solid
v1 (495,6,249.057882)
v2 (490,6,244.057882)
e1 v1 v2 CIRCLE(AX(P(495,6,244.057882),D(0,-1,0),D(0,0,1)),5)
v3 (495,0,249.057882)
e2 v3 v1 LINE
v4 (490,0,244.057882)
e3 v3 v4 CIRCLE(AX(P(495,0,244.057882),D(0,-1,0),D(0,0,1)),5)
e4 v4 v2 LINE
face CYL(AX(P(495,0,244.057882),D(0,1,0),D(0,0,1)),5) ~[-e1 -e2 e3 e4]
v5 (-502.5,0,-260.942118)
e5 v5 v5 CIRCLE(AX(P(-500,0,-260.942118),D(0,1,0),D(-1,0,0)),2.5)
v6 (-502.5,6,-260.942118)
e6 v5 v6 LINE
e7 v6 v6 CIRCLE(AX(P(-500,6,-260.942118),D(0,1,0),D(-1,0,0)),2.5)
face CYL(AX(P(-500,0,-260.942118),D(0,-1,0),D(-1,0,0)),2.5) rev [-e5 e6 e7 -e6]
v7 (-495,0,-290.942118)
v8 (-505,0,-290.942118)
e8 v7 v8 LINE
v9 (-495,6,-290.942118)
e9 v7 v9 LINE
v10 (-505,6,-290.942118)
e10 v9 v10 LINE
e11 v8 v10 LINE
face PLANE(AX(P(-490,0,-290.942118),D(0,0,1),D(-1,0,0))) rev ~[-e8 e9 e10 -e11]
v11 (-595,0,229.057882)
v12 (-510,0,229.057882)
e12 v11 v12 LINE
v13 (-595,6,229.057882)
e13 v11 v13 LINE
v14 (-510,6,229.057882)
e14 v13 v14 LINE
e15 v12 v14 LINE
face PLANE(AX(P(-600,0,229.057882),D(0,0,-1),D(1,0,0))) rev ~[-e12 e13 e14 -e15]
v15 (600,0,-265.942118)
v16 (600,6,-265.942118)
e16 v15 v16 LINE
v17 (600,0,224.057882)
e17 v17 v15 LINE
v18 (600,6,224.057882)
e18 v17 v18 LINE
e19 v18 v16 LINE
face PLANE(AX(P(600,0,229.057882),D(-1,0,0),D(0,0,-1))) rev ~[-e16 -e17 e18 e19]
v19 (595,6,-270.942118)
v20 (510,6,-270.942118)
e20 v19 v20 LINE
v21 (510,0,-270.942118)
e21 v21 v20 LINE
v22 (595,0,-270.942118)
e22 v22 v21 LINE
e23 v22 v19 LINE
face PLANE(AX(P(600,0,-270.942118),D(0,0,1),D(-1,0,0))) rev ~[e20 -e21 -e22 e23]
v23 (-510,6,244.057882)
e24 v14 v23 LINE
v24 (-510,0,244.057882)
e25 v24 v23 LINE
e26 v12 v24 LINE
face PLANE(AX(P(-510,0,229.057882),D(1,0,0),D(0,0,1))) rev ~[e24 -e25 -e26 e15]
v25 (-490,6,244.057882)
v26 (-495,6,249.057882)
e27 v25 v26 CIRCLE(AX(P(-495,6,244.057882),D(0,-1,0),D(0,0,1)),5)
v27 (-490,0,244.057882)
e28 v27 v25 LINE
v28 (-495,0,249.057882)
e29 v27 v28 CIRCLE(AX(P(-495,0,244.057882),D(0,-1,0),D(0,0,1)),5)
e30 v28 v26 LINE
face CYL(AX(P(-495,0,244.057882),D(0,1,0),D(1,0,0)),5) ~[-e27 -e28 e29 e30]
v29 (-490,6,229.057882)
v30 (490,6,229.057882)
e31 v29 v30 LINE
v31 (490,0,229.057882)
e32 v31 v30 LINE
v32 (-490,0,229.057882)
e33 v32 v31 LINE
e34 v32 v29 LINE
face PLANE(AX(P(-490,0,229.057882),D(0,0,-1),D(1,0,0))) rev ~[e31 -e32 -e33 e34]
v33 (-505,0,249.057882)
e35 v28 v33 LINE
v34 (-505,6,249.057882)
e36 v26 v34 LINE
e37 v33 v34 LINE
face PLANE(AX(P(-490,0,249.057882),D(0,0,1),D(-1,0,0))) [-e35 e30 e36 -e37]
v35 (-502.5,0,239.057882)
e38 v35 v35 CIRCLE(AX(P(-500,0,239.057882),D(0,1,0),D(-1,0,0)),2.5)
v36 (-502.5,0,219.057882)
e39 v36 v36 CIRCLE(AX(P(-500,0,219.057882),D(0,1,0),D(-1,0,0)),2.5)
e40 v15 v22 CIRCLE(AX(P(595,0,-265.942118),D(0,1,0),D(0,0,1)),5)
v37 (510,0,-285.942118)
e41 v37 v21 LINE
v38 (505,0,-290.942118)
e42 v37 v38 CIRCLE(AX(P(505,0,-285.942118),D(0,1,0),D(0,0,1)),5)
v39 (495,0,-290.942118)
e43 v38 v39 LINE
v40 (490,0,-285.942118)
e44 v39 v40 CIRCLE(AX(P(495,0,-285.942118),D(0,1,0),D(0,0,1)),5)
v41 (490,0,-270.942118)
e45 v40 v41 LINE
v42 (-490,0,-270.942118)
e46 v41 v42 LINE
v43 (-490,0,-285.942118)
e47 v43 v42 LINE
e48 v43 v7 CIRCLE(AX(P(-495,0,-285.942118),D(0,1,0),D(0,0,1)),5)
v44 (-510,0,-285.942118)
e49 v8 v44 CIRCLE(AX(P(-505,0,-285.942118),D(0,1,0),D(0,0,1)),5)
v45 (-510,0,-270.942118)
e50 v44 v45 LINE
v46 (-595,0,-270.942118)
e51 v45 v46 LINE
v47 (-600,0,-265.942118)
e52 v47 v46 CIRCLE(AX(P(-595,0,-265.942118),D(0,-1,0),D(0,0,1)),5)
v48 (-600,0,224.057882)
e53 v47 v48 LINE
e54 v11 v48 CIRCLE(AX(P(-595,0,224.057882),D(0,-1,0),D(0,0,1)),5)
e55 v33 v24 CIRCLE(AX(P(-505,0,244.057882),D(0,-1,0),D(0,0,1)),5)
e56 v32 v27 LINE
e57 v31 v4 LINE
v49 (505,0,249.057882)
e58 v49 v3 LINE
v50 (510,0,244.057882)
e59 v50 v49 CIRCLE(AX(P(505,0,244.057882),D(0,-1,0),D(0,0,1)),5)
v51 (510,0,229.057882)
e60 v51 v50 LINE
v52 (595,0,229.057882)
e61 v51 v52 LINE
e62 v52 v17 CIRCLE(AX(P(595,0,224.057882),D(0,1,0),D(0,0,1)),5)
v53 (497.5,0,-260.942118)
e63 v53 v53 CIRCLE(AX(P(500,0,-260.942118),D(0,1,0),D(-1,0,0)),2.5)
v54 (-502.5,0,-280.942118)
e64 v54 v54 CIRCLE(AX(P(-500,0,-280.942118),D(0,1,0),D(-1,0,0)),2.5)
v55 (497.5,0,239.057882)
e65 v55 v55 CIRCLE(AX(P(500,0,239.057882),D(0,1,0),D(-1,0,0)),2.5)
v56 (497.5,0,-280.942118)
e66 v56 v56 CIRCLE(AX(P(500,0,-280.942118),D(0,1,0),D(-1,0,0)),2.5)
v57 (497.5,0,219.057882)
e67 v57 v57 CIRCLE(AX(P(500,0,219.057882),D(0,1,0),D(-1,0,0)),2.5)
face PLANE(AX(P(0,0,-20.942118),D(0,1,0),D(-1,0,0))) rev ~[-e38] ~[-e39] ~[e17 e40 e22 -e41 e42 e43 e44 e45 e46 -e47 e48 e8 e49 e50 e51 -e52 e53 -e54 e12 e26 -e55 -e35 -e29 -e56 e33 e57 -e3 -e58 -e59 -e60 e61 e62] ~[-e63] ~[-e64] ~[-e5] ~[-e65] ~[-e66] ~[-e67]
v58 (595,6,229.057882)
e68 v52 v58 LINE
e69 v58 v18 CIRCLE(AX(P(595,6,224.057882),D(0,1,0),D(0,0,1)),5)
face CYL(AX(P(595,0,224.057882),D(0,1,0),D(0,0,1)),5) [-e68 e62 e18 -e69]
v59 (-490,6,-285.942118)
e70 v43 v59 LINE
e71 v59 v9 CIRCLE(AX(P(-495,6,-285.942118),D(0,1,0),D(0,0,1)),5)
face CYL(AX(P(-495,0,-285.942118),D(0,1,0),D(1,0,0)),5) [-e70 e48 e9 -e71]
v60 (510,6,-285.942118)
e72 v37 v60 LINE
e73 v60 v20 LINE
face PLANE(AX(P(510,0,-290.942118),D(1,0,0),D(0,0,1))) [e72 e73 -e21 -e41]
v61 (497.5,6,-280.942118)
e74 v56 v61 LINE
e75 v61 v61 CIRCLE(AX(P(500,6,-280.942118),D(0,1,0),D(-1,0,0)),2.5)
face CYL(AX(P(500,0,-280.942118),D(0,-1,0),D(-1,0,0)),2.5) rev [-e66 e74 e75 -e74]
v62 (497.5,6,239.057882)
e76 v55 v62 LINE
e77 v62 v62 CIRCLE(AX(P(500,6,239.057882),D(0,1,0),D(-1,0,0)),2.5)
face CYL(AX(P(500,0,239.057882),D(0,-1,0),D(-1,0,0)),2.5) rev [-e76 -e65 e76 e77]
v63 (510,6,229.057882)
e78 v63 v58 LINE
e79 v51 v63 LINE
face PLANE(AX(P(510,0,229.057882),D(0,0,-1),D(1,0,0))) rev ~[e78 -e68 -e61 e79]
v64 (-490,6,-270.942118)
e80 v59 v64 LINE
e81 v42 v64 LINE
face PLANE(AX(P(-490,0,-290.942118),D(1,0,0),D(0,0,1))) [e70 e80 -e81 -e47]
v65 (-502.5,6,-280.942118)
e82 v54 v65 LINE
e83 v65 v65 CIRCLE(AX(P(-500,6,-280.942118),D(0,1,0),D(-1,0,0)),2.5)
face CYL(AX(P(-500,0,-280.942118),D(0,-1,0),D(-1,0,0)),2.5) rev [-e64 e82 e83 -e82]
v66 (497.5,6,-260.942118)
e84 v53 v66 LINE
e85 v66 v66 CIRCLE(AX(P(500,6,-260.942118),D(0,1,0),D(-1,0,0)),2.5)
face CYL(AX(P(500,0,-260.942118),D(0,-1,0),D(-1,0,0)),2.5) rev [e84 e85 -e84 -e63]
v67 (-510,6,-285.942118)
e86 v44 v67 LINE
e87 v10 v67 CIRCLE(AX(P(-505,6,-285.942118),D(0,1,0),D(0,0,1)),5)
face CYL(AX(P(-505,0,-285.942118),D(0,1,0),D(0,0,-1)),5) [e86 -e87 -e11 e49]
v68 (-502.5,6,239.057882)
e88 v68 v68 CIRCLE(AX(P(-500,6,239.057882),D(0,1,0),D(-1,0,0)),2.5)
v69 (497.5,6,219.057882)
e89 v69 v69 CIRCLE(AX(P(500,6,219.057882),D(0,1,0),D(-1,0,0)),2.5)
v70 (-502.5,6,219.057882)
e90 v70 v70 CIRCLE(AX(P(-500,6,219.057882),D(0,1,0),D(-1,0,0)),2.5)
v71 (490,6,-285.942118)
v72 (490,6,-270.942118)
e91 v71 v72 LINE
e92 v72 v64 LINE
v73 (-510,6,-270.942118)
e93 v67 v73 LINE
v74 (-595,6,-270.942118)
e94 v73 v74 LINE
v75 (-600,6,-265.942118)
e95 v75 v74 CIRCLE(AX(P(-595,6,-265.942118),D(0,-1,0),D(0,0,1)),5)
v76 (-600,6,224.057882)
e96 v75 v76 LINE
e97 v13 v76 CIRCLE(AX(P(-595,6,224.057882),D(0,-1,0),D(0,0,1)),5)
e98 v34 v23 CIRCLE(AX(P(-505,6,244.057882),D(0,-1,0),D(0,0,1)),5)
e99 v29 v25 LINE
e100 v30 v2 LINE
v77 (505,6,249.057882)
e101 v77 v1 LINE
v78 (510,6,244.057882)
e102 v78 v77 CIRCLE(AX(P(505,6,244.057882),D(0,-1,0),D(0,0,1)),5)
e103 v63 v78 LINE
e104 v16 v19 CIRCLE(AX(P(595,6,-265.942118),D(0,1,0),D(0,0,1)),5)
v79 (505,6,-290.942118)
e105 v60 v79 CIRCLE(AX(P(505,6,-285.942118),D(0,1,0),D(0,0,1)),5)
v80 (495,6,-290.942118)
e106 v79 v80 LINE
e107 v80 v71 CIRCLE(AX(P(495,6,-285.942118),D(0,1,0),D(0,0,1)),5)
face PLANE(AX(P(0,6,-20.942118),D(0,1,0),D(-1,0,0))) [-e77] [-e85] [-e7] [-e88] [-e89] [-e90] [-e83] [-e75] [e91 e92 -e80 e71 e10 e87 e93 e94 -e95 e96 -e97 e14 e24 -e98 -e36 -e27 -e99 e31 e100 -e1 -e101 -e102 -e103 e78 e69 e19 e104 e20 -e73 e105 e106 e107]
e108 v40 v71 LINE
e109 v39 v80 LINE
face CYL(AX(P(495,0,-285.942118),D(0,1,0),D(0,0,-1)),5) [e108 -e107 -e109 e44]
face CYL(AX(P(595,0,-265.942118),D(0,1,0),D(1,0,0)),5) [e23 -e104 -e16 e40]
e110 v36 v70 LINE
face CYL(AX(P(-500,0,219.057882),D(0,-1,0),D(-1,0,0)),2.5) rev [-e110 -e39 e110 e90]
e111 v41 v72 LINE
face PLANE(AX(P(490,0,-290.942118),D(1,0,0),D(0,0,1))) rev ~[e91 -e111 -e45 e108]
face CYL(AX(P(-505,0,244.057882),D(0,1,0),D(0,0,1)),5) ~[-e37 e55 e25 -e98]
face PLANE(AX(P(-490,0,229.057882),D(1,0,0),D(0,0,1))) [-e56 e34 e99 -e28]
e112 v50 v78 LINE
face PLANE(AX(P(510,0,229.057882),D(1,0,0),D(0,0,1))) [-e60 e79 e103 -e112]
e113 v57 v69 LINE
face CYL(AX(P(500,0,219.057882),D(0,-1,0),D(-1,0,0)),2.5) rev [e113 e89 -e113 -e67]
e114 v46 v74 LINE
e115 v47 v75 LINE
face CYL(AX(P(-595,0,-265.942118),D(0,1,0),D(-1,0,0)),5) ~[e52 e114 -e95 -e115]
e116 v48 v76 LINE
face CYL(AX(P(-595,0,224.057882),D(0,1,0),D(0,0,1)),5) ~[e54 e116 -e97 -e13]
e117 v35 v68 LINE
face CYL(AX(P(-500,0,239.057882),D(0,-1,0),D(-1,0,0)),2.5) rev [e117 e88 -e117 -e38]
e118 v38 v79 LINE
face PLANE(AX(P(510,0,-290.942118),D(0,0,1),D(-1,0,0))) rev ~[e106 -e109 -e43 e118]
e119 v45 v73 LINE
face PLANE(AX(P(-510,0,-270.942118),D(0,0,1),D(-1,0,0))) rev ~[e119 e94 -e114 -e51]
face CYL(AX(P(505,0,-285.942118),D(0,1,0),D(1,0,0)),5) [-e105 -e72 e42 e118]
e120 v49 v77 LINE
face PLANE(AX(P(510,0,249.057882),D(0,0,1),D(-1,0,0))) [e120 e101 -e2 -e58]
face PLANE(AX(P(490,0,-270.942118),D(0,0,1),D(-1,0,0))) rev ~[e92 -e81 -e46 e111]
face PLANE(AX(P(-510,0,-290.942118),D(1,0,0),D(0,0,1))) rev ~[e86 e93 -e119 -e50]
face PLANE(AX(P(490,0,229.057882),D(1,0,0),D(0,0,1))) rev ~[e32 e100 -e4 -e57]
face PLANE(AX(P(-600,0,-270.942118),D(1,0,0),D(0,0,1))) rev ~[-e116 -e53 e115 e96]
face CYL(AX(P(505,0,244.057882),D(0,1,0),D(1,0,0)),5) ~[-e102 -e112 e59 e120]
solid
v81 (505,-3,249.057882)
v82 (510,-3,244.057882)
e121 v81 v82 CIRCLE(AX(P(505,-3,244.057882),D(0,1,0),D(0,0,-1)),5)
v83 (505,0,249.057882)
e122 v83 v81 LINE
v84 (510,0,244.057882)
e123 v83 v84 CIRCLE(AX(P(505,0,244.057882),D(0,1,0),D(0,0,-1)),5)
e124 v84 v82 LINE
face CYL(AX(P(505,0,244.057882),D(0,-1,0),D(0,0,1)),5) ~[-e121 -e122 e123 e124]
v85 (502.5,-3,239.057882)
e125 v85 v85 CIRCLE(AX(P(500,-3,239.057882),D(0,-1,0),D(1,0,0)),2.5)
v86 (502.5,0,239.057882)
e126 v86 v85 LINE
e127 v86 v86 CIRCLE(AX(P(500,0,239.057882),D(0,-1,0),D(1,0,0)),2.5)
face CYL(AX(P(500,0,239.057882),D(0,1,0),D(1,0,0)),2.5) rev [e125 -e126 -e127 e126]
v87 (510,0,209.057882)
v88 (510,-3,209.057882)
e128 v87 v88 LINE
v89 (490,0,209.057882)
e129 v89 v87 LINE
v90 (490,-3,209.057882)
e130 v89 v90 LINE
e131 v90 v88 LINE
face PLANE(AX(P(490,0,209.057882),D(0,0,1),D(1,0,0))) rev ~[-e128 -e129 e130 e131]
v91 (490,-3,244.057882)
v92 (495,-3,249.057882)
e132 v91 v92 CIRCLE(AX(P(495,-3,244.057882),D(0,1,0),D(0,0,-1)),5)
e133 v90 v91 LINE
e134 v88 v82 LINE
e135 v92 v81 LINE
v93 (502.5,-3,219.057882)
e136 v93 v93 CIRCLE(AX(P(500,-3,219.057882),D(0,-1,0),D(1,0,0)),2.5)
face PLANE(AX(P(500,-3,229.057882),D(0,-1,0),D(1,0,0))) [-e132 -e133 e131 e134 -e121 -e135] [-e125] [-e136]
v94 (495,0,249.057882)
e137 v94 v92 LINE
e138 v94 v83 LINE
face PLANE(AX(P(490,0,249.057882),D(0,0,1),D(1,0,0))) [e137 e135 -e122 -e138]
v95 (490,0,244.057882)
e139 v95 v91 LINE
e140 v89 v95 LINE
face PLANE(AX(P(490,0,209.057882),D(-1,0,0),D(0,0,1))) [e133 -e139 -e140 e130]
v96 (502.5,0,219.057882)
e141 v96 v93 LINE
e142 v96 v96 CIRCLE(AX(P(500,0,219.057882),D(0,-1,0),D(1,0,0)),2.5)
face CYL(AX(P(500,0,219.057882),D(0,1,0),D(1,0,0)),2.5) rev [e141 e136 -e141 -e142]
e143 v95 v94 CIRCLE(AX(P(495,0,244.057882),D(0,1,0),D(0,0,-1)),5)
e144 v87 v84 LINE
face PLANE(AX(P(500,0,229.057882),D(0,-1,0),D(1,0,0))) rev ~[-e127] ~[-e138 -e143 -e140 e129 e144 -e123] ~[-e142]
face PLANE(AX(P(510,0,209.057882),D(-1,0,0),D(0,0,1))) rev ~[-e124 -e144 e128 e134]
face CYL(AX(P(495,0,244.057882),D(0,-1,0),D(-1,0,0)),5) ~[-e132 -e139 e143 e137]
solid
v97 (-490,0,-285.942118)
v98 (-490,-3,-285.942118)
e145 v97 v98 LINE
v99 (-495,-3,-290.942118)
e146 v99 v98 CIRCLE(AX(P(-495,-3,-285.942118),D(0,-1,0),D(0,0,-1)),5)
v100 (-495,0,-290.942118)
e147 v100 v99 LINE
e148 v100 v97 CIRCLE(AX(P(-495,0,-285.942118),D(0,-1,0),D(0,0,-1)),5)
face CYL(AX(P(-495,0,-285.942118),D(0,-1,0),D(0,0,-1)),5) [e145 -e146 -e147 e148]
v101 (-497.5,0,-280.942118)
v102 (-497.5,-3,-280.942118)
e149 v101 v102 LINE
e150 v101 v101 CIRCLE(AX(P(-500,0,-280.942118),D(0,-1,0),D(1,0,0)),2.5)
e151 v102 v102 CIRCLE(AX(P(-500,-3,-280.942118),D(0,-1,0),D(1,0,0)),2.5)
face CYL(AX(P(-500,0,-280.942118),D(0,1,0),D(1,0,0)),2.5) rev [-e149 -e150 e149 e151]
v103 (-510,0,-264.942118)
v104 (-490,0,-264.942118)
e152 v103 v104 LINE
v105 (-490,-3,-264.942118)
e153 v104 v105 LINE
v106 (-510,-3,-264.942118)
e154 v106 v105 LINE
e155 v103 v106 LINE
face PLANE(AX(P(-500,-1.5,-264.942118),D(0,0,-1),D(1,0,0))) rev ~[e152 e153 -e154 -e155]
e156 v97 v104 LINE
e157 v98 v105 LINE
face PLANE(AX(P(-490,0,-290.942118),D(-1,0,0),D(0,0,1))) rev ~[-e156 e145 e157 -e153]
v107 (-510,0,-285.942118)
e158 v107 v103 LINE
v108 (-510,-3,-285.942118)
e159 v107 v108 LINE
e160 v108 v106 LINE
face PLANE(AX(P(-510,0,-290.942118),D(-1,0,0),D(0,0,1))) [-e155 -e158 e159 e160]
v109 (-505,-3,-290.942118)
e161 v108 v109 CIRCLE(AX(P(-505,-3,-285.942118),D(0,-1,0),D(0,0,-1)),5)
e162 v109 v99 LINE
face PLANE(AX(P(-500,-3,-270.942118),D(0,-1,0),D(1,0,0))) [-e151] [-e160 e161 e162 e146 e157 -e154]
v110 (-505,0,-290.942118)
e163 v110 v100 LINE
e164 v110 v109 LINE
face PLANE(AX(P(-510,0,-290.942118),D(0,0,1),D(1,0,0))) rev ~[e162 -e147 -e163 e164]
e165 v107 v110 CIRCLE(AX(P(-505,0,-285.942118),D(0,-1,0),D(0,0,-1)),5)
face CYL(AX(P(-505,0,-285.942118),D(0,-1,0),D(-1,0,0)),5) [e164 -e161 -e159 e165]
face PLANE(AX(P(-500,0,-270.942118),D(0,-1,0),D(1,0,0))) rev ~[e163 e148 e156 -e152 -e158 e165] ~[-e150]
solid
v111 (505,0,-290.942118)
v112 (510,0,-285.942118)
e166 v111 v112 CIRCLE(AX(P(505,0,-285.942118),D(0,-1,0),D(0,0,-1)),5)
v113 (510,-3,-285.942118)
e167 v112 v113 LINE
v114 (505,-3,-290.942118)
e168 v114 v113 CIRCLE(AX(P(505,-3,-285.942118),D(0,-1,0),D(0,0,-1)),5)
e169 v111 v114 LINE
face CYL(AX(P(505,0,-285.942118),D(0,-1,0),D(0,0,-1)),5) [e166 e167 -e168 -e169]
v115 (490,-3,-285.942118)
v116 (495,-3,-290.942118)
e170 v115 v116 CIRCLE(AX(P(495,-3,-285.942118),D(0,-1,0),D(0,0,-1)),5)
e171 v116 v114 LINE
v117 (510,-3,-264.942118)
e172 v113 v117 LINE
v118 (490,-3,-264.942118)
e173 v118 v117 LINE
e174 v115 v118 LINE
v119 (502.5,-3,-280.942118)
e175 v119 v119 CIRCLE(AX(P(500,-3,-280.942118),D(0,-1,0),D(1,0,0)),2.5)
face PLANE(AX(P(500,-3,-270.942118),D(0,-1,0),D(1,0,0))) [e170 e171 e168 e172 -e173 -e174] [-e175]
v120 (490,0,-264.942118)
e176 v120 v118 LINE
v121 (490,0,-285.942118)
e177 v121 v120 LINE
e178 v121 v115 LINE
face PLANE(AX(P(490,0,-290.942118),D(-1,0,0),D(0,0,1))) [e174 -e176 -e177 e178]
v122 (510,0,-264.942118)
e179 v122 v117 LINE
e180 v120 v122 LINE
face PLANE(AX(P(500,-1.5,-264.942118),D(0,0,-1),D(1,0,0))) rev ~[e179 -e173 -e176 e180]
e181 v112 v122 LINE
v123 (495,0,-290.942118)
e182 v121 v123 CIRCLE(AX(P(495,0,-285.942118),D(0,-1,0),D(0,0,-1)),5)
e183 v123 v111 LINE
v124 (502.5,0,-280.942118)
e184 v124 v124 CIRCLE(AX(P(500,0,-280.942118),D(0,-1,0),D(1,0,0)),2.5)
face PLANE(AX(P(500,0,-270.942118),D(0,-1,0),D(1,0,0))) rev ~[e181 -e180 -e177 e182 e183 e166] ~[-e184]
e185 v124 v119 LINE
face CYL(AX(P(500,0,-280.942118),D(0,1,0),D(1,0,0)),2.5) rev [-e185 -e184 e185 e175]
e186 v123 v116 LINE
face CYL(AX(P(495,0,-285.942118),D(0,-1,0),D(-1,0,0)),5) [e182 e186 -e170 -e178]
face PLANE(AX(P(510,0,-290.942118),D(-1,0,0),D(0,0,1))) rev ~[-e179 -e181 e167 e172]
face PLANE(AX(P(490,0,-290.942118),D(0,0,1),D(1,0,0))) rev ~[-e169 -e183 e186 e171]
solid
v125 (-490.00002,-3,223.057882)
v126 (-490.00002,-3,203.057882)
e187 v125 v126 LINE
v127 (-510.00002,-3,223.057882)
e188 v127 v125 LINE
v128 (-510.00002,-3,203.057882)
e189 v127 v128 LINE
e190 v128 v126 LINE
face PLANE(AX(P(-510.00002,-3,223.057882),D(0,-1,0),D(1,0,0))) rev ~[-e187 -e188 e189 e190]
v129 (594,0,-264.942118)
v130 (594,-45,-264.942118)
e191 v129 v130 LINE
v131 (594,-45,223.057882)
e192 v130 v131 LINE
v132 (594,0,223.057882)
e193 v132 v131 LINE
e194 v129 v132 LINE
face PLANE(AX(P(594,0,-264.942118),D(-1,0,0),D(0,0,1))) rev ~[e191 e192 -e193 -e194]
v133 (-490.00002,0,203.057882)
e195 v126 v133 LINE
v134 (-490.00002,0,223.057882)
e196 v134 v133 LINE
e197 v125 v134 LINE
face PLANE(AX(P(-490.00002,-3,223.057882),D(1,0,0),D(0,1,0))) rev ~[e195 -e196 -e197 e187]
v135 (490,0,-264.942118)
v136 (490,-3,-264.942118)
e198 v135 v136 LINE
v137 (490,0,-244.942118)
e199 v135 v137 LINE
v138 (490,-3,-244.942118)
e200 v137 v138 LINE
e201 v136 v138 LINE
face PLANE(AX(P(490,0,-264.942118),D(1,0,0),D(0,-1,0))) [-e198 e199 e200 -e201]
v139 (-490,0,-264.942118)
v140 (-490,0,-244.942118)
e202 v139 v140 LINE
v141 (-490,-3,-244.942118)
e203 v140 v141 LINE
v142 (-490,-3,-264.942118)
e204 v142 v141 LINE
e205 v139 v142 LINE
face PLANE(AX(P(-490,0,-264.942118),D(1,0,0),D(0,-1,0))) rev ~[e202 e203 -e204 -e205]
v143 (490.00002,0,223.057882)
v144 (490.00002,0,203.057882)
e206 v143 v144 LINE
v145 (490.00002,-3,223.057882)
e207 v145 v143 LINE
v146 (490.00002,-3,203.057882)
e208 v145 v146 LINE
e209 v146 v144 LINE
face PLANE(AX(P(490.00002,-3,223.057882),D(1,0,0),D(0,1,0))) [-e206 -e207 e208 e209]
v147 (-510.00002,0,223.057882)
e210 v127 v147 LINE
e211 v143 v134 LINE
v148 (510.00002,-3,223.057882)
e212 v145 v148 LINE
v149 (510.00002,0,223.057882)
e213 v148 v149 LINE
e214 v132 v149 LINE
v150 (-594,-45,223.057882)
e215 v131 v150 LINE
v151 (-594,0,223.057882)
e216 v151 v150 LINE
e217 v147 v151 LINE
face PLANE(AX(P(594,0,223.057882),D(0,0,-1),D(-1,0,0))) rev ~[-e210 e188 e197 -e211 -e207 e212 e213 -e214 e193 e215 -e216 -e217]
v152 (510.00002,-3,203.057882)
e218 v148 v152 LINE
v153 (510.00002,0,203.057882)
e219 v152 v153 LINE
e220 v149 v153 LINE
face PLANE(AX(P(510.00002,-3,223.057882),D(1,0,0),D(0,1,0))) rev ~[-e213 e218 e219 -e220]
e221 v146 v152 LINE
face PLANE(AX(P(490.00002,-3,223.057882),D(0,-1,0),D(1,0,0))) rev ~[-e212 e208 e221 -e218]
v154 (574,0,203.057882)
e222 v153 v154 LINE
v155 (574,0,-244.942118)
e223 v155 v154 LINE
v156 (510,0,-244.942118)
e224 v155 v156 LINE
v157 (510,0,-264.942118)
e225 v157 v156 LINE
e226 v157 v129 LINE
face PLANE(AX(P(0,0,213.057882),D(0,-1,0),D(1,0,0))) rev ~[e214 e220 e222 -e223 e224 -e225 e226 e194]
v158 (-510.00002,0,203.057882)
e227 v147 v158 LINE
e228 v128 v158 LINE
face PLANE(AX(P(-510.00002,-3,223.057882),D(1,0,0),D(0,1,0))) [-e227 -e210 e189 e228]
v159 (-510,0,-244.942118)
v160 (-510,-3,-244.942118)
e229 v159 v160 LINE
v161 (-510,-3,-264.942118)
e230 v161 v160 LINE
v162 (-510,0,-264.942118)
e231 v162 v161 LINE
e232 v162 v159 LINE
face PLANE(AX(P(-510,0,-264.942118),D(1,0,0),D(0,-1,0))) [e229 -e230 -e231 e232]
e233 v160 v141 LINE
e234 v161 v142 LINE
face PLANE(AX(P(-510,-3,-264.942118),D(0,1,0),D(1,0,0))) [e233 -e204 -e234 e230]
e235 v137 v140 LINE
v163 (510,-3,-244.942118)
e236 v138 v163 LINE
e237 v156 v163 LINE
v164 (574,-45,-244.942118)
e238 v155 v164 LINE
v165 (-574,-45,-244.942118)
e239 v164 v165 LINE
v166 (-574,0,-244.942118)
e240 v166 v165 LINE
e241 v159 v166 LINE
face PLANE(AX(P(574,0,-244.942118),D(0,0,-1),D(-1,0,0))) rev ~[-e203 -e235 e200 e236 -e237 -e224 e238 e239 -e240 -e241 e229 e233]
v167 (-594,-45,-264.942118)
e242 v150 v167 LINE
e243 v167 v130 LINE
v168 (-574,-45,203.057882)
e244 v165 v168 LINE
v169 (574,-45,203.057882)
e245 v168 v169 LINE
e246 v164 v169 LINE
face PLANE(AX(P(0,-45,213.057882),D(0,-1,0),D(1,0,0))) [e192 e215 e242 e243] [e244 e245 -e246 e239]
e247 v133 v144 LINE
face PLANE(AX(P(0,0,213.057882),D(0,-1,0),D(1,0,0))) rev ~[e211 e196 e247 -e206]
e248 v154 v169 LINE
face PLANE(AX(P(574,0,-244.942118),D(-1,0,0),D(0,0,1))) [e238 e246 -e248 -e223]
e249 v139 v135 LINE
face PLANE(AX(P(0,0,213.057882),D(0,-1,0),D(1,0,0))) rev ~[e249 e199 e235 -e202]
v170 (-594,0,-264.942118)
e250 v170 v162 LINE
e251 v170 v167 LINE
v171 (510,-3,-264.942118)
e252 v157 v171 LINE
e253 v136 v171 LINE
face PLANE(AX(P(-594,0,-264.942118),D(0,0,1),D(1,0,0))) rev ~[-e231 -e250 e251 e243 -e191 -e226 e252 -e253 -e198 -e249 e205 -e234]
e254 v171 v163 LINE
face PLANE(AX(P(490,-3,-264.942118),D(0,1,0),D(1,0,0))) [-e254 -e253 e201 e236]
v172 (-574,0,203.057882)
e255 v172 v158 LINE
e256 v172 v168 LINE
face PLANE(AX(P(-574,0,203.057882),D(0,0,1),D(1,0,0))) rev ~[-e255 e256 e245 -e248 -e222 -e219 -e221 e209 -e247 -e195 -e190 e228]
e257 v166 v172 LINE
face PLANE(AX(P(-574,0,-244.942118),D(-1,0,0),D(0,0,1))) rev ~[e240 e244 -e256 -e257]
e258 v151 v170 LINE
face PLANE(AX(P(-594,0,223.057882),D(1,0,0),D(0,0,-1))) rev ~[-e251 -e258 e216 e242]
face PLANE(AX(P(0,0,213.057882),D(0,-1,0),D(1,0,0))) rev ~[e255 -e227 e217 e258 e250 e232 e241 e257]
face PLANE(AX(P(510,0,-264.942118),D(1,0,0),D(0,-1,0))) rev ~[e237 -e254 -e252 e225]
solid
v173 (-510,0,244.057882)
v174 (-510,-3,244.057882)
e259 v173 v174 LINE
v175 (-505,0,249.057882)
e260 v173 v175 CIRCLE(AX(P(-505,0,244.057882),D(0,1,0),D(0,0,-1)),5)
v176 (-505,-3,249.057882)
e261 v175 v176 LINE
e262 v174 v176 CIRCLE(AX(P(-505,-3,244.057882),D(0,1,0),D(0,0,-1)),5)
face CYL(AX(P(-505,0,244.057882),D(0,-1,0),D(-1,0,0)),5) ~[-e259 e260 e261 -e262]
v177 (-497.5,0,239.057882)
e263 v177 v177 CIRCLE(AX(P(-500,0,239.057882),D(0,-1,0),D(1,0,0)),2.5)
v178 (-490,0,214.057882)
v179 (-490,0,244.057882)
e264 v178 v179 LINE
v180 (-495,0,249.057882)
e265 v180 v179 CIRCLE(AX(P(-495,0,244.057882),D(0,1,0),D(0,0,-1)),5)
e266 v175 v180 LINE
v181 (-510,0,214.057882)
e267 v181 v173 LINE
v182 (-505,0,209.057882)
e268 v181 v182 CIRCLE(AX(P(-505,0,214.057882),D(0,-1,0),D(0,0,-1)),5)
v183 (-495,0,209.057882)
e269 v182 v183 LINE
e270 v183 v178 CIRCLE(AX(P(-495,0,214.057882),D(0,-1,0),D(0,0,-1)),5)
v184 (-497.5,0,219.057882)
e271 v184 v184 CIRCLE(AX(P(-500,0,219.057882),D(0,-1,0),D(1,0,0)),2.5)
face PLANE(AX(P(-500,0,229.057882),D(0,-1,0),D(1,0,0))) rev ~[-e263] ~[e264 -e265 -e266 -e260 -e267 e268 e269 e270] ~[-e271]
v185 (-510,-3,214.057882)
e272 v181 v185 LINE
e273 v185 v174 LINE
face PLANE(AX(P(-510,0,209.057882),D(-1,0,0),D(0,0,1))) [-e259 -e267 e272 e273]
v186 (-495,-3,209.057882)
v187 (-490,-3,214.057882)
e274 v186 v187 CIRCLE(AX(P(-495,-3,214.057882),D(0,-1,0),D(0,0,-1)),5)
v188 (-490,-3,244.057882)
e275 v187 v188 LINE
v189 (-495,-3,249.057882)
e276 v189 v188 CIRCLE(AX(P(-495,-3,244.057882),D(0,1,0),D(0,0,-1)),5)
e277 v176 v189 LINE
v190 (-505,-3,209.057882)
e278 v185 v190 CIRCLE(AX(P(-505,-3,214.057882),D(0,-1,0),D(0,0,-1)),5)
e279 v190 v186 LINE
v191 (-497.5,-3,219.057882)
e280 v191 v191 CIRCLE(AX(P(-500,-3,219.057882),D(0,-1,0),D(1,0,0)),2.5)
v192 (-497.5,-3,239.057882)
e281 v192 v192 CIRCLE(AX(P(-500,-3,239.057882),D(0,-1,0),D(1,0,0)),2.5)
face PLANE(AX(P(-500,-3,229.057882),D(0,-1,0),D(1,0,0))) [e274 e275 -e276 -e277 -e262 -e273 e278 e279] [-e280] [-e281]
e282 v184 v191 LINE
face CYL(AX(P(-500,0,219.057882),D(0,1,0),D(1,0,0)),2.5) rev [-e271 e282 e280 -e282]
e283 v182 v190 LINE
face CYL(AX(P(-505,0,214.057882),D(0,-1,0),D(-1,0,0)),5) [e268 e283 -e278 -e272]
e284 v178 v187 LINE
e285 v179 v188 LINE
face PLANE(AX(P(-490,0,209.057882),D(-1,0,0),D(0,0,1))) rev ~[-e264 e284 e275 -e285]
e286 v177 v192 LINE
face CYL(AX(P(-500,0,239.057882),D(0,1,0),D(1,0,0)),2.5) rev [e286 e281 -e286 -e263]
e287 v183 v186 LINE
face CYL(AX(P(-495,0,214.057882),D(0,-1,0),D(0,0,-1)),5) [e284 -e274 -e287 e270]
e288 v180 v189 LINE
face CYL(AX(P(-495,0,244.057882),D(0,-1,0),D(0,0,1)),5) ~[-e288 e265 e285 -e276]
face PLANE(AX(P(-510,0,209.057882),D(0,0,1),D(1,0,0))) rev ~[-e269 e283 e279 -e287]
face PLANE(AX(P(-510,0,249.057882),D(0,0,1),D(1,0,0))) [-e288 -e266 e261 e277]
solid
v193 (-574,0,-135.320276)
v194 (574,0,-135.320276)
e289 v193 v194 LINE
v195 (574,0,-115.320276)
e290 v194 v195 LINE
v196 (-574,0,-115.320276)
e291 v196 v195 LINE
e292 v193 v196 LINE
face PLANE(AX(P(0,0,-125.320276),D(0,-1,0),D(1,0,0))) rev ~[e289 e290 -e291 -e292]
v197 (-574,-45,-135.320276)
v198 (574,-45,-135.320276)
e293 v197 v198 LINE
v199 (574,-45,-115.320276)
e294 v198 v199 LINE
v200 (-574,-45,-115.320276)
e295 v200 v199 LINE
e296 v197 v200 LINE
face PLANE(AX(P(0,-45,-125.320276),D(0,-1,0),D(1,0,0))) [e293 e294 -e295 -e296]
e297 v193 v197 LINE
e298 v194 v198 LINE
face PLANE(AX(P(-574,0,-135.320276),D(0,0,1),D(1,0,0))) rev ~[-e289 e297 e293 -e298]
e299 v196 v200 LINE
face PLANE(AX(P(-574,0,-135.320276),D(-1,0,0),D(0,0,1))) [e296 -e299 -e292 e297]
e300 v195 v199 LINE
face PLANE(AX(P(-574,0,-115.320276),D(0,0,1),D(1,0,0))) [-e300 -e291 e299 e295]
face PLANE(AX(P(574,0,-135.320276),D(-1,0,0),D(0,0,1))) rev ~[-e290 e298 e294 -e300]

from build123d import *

# Parameters (mm, degrees)
F0_W      = 20
F0_H      = 448
F1_DEPTH  = 45
F2_W      = 20
F2_H      = 20
F2_R      = 2.5
F3_DEPTH  = 6
F4_W      = 1148
F4_H      = 20
F5_DEPTH  = 45
F6_R      = 5
F7_R      = 5
F8_W      = 20
F8_H      = 3
F9_DEPTH  = 25
F10_W     = 20
F10_H     = 40
F10_R     = 2.5
F11_DEPTH = 3
F12_R     = 5
F13_W     = 20
F13_H     = 3
F14_DEPTH = 25
F15_R     = 5
F15_2_R   = 5
F16_R     = 5


with BuildPart() as f1:
    # F0 (on Front) → F1 (new body)
    with BuildSketch(Plane.XZ):
        Polygon((-594, 223.0578817198), (-594, 203.0578817198), (-574, 203.0578817198), (574, 203.0578817198), (594, 203.0578817198), (594, 223.0578817198), align=None)
        with Locations((-584, -20.9421182802)):
            Rectangle(F0_W, F0_H)
        Polygon((-574, -244.9421182802), (-594, -244.9421182802), (-594, -264.9421182802), (594, -264.9421182802), (594, -244.9421182802), (574, -244.9421182802), align=None)
        with Locations((584, -20.9421182802)):
            Rectangle(F0_W, F0_H)
    extrude(amount=F1_DEPTH)

    # F8 (on face) → F9 (cut)
    with BuildSketch(Plane.XY.offset(223.0578817198)):
        with Locations((-500.0000202656, -1.5)):
            Rectangle(F8_W, F8_H)
        with Locations((500.0000202656, -1.5)):
            Rectangle(F8_W, F8_H)
    extrude(amount=-F9_DEPTH, mode=Mode.SUBTRACT)


with BuildPart() as f3:
    # F2 (on face) → F3 (new body)
    with BuildSketch(Plane(origin=(0, 0, 0), x_dir=(-1, 0, 0), z_dir=(0, 1, 0))):
        Polygon((-510, 229.0578817198), (-600, 229.0578817198), (-600, -270.9421182802), (-510, -270.9421182802), (-510, -250.9421182802), (-490, -250.9421182802), (-490, -270.9421182802), (490, -270.9421182802), (490, -250.9421182802), (510, -250.9421182802), (510, -270.9421182802), (600, -270.9421182802), (600, 229.0578817198), (510, 229.0578817198), (510, 209.0578817198), (490, 209.0578817198), (490, 229.0578817198), (-490, 229.0578817198), (-490, 209.0578817198), (-510, 209.0578817198), align=None)
        with Locations((-500, 239.0578817198)):
            Rectangle(F2_W, F2_H)
        with Locations((-500, 239.0578817198)):
            Circle(F2_R, mode=Mode.SUBTRACT)
        with Locations((-500, 219.0578817198)):
            Rectangle(F2_W, F2_H)
        with Locations((-500, 219.0578817198)):
            Circle(F2_R, mode=Mode.SUBTRACT)
        with Locations((-500, -260.9421182802)):
            Rectangle(F2_W, F2_H)
        with Locations((-500, -260.9421182802)):
            Circle(F2_R, mode=Mode.SUBTRACT)
        with Locations((-500, -280.9421182802)):
            Rectangle(F2_W, F2_H)
        with Locations((-500, -280.9421182802)):
            Circle(F2_R, mode=Mode.SUBTRACT)
        with Locations((500, 239.0578817198)):
            Rectangle(F2_W, F2_H)
        with Locations((500, 239.0578817198)):
            Circle(F2_R, mode=Mode.SUBTRACT)
        with Locations((500, 219.0578817198)):
            Rectangle(F2_W, F2_H)
        with Locations((500, 219.0578817198)):
            Circle(F2_R, mode=Mode.SUBTRACT)
        with Locations((500, -260.9421182802)):
            Rectangle(F2_W, F2_H)
        with Locations((500, -260.9421182802)):
            Circle(F2_R, mode=Mode.SUBTRACT)
        with Locations((500, -280.9421182802)):
            Rectangle(F2_W, F2_H)
        with Locations((500, -280.9421182802)):
            Circle(F2_R, mode=Mode.SUBTRACT)
    extrude(amount=F3_DEPTH)

    # F6
    f6_edges = [f3.edges().sort_by_distance(p)[0] for p in [
        (510, 3, 249.057882),
        (490, 3, 249.057882),
    ]]
    fillet(f6_edges, radius=F6_R)

    # F7
    f7_edges = [f3.edges().sort_by_distance(p)[0] for p in [
        (510, 3, -290.942118),
        (490, 3, -290.942118),
        (-510, 3, 249.057882),
        (-490, 3, 249.057882),
        (-510, 3, -290.942118),
        (-490, 3, -290.942118),
        (600, 3, 229.057882),
        (-600, 3, 229.057882),
        (600, 3, -270.942118),
        (-600, 3, -270.942118),
    ]]
    fillet(f7_edges, radius=F7_R)


with BuildPart() as f5:
    # F4 (on face) → F5 (new body)
    with BuildSketch(Plane.XZ):
        with Locations((0, -125.320276022)):
            Rectangle(F4_W, F4_H)
    extrude(amount=F5_DEPTH)


with BuildPart() as f11:
    # F10 (on face) → F11 (new body)
    with BuildSketch(Plane.XZ):
        with Locations((-500, 229.0578817198)):
            Rectangle(F10_W, F10_H)
        with Locations((-500, 219.0578817198)):
            Circle(F10_R, mode=Mode.SUBTRACT)
        with Locations((-500, 239.0578817198)):
            Circle(F10_R, mode=Mode.SUBTRACT)
    extrude(amount=F11_DEPTH)

    # F12
    f12_edges = [f11.edges().sort_by_distance(p)[0] for p in [
        (-510, -1.5, 249.057882),
        (-490, -1.5, 249.057882),
        (-490, -1.5, 209.057882),
        (-510, -1.5, 209.057882),
    ]]
    fillet(f12_edges, radius=F12_R)


with BuildPart() as f11b:
    # F10 (on face) → F11, piece 2 (new body)
    with BuildSketch(Plane.XZ):
        with Locations((500, 229.0578817198)):
            Rectangle(F10_W, F10_H)
        with Locations((500, 219.0578817198)):
            Circle(F10_R, mode=Mode.SUBTRACT)
        with Locations((500, 239.0578817198)):
            Circle(F10_R, mode=Mode.SUBTRACT)
    extrude(amount=F11_DEPTH)

    # F15
    f15_edges = [f11b.edges().sort_by_distance(p)[0] for p in [
        (510, -1.5, 249.057882),
        (490, -1.5, 249.057882),
    ]]
    fillet(f15_edges, radius=F15_R)


with BuildPart() as f11c:
    # F10 (on face) → F11, piece 3 (new body)
    with BuildSketch(Plane.XZ):
        with Locations((-500, -270.9421182802)):
            Rectangle(F10_W, F10_H)
        with Locations((-500, -280.9421182802)):
            Circle(F10_R, mode=Mode.SUBTRACT)
        with Locations((-500, -260.9421182802)):
            Circle(F10_R, mode=Mode.SUBTRACT)
    extrude(amount=F11_DEPTH)


with BuildPart() as f11d:
    # F10 (on face) → F11, piece 4 (new body)
    with BuildSketch(Plane.XZ):
        with Locations((500, -270.9421182802)):
            Rectangle(F10_W, F10_H)
        with Locations((500, -280.9421182802)):
            Circle(F10_R, mode=Mode.SUBTRACT)
        with Locations((500, -260.9421182802)):
            Circle(F10_R, mode=Mode.SUBTRACT)
    extrude(amount=F11_DEPTH)


with BuildPart() as f14_tool:
    # F13 (on face) → F14 (new body)
    with BuildSketch(Plane(origin=(0, 0, -264.9421182802), x_dir=(1, 0, 0), z_dir=(0, 0, -1))):
        with Locations((500, 1.5)):
            Rectangle(F13_W, F13_H)
        with Locations((-500, 1.5)):
            Rectangle(F13_W, F13_H)
    extrude(amount=-F14_DEPTH)


with BuildPart() as f1_1:
    add(f1.part)

    # F14: cut by f14_tool
    add(f14_tool.part, mode=Mode.SUBTRACT)


with BuildPart() as f11c_1:
    add(f11c.part)

    # F14: cut by f14_tool
    add(f14_tool.part, mode=Mode.SUBTRACT)

    # F15#2
    f15_2_edges = [f11c_1.edges().sort_by_distance(p)[0] for p in [
        (-510, -1.5, -290.942118),
        (-490, -1.5, -290.942118),
    ]]
    fillet(f15_2_edges, radius=F15_2_R)


with BuildPart() as f11d_1:
    add(f11d.part)

    # F14: cut by f14_tool
    add(f14_tool.part, mode=Mode.SUBTRACT)

    # F16
    f16_edges = [f11d_1.edges().sort_by_distance(p)[0] for p in [
        (510, -1.5, -290.942118),
        (490, -1.5, -290.942118),
    ]]
    fillet(f16_edges, radius=F16_R)


solid = Compound([f3.part, f5.part, f11.part, f11b.part, f1_1.part, f11c_1.part, f11d_1.part])
